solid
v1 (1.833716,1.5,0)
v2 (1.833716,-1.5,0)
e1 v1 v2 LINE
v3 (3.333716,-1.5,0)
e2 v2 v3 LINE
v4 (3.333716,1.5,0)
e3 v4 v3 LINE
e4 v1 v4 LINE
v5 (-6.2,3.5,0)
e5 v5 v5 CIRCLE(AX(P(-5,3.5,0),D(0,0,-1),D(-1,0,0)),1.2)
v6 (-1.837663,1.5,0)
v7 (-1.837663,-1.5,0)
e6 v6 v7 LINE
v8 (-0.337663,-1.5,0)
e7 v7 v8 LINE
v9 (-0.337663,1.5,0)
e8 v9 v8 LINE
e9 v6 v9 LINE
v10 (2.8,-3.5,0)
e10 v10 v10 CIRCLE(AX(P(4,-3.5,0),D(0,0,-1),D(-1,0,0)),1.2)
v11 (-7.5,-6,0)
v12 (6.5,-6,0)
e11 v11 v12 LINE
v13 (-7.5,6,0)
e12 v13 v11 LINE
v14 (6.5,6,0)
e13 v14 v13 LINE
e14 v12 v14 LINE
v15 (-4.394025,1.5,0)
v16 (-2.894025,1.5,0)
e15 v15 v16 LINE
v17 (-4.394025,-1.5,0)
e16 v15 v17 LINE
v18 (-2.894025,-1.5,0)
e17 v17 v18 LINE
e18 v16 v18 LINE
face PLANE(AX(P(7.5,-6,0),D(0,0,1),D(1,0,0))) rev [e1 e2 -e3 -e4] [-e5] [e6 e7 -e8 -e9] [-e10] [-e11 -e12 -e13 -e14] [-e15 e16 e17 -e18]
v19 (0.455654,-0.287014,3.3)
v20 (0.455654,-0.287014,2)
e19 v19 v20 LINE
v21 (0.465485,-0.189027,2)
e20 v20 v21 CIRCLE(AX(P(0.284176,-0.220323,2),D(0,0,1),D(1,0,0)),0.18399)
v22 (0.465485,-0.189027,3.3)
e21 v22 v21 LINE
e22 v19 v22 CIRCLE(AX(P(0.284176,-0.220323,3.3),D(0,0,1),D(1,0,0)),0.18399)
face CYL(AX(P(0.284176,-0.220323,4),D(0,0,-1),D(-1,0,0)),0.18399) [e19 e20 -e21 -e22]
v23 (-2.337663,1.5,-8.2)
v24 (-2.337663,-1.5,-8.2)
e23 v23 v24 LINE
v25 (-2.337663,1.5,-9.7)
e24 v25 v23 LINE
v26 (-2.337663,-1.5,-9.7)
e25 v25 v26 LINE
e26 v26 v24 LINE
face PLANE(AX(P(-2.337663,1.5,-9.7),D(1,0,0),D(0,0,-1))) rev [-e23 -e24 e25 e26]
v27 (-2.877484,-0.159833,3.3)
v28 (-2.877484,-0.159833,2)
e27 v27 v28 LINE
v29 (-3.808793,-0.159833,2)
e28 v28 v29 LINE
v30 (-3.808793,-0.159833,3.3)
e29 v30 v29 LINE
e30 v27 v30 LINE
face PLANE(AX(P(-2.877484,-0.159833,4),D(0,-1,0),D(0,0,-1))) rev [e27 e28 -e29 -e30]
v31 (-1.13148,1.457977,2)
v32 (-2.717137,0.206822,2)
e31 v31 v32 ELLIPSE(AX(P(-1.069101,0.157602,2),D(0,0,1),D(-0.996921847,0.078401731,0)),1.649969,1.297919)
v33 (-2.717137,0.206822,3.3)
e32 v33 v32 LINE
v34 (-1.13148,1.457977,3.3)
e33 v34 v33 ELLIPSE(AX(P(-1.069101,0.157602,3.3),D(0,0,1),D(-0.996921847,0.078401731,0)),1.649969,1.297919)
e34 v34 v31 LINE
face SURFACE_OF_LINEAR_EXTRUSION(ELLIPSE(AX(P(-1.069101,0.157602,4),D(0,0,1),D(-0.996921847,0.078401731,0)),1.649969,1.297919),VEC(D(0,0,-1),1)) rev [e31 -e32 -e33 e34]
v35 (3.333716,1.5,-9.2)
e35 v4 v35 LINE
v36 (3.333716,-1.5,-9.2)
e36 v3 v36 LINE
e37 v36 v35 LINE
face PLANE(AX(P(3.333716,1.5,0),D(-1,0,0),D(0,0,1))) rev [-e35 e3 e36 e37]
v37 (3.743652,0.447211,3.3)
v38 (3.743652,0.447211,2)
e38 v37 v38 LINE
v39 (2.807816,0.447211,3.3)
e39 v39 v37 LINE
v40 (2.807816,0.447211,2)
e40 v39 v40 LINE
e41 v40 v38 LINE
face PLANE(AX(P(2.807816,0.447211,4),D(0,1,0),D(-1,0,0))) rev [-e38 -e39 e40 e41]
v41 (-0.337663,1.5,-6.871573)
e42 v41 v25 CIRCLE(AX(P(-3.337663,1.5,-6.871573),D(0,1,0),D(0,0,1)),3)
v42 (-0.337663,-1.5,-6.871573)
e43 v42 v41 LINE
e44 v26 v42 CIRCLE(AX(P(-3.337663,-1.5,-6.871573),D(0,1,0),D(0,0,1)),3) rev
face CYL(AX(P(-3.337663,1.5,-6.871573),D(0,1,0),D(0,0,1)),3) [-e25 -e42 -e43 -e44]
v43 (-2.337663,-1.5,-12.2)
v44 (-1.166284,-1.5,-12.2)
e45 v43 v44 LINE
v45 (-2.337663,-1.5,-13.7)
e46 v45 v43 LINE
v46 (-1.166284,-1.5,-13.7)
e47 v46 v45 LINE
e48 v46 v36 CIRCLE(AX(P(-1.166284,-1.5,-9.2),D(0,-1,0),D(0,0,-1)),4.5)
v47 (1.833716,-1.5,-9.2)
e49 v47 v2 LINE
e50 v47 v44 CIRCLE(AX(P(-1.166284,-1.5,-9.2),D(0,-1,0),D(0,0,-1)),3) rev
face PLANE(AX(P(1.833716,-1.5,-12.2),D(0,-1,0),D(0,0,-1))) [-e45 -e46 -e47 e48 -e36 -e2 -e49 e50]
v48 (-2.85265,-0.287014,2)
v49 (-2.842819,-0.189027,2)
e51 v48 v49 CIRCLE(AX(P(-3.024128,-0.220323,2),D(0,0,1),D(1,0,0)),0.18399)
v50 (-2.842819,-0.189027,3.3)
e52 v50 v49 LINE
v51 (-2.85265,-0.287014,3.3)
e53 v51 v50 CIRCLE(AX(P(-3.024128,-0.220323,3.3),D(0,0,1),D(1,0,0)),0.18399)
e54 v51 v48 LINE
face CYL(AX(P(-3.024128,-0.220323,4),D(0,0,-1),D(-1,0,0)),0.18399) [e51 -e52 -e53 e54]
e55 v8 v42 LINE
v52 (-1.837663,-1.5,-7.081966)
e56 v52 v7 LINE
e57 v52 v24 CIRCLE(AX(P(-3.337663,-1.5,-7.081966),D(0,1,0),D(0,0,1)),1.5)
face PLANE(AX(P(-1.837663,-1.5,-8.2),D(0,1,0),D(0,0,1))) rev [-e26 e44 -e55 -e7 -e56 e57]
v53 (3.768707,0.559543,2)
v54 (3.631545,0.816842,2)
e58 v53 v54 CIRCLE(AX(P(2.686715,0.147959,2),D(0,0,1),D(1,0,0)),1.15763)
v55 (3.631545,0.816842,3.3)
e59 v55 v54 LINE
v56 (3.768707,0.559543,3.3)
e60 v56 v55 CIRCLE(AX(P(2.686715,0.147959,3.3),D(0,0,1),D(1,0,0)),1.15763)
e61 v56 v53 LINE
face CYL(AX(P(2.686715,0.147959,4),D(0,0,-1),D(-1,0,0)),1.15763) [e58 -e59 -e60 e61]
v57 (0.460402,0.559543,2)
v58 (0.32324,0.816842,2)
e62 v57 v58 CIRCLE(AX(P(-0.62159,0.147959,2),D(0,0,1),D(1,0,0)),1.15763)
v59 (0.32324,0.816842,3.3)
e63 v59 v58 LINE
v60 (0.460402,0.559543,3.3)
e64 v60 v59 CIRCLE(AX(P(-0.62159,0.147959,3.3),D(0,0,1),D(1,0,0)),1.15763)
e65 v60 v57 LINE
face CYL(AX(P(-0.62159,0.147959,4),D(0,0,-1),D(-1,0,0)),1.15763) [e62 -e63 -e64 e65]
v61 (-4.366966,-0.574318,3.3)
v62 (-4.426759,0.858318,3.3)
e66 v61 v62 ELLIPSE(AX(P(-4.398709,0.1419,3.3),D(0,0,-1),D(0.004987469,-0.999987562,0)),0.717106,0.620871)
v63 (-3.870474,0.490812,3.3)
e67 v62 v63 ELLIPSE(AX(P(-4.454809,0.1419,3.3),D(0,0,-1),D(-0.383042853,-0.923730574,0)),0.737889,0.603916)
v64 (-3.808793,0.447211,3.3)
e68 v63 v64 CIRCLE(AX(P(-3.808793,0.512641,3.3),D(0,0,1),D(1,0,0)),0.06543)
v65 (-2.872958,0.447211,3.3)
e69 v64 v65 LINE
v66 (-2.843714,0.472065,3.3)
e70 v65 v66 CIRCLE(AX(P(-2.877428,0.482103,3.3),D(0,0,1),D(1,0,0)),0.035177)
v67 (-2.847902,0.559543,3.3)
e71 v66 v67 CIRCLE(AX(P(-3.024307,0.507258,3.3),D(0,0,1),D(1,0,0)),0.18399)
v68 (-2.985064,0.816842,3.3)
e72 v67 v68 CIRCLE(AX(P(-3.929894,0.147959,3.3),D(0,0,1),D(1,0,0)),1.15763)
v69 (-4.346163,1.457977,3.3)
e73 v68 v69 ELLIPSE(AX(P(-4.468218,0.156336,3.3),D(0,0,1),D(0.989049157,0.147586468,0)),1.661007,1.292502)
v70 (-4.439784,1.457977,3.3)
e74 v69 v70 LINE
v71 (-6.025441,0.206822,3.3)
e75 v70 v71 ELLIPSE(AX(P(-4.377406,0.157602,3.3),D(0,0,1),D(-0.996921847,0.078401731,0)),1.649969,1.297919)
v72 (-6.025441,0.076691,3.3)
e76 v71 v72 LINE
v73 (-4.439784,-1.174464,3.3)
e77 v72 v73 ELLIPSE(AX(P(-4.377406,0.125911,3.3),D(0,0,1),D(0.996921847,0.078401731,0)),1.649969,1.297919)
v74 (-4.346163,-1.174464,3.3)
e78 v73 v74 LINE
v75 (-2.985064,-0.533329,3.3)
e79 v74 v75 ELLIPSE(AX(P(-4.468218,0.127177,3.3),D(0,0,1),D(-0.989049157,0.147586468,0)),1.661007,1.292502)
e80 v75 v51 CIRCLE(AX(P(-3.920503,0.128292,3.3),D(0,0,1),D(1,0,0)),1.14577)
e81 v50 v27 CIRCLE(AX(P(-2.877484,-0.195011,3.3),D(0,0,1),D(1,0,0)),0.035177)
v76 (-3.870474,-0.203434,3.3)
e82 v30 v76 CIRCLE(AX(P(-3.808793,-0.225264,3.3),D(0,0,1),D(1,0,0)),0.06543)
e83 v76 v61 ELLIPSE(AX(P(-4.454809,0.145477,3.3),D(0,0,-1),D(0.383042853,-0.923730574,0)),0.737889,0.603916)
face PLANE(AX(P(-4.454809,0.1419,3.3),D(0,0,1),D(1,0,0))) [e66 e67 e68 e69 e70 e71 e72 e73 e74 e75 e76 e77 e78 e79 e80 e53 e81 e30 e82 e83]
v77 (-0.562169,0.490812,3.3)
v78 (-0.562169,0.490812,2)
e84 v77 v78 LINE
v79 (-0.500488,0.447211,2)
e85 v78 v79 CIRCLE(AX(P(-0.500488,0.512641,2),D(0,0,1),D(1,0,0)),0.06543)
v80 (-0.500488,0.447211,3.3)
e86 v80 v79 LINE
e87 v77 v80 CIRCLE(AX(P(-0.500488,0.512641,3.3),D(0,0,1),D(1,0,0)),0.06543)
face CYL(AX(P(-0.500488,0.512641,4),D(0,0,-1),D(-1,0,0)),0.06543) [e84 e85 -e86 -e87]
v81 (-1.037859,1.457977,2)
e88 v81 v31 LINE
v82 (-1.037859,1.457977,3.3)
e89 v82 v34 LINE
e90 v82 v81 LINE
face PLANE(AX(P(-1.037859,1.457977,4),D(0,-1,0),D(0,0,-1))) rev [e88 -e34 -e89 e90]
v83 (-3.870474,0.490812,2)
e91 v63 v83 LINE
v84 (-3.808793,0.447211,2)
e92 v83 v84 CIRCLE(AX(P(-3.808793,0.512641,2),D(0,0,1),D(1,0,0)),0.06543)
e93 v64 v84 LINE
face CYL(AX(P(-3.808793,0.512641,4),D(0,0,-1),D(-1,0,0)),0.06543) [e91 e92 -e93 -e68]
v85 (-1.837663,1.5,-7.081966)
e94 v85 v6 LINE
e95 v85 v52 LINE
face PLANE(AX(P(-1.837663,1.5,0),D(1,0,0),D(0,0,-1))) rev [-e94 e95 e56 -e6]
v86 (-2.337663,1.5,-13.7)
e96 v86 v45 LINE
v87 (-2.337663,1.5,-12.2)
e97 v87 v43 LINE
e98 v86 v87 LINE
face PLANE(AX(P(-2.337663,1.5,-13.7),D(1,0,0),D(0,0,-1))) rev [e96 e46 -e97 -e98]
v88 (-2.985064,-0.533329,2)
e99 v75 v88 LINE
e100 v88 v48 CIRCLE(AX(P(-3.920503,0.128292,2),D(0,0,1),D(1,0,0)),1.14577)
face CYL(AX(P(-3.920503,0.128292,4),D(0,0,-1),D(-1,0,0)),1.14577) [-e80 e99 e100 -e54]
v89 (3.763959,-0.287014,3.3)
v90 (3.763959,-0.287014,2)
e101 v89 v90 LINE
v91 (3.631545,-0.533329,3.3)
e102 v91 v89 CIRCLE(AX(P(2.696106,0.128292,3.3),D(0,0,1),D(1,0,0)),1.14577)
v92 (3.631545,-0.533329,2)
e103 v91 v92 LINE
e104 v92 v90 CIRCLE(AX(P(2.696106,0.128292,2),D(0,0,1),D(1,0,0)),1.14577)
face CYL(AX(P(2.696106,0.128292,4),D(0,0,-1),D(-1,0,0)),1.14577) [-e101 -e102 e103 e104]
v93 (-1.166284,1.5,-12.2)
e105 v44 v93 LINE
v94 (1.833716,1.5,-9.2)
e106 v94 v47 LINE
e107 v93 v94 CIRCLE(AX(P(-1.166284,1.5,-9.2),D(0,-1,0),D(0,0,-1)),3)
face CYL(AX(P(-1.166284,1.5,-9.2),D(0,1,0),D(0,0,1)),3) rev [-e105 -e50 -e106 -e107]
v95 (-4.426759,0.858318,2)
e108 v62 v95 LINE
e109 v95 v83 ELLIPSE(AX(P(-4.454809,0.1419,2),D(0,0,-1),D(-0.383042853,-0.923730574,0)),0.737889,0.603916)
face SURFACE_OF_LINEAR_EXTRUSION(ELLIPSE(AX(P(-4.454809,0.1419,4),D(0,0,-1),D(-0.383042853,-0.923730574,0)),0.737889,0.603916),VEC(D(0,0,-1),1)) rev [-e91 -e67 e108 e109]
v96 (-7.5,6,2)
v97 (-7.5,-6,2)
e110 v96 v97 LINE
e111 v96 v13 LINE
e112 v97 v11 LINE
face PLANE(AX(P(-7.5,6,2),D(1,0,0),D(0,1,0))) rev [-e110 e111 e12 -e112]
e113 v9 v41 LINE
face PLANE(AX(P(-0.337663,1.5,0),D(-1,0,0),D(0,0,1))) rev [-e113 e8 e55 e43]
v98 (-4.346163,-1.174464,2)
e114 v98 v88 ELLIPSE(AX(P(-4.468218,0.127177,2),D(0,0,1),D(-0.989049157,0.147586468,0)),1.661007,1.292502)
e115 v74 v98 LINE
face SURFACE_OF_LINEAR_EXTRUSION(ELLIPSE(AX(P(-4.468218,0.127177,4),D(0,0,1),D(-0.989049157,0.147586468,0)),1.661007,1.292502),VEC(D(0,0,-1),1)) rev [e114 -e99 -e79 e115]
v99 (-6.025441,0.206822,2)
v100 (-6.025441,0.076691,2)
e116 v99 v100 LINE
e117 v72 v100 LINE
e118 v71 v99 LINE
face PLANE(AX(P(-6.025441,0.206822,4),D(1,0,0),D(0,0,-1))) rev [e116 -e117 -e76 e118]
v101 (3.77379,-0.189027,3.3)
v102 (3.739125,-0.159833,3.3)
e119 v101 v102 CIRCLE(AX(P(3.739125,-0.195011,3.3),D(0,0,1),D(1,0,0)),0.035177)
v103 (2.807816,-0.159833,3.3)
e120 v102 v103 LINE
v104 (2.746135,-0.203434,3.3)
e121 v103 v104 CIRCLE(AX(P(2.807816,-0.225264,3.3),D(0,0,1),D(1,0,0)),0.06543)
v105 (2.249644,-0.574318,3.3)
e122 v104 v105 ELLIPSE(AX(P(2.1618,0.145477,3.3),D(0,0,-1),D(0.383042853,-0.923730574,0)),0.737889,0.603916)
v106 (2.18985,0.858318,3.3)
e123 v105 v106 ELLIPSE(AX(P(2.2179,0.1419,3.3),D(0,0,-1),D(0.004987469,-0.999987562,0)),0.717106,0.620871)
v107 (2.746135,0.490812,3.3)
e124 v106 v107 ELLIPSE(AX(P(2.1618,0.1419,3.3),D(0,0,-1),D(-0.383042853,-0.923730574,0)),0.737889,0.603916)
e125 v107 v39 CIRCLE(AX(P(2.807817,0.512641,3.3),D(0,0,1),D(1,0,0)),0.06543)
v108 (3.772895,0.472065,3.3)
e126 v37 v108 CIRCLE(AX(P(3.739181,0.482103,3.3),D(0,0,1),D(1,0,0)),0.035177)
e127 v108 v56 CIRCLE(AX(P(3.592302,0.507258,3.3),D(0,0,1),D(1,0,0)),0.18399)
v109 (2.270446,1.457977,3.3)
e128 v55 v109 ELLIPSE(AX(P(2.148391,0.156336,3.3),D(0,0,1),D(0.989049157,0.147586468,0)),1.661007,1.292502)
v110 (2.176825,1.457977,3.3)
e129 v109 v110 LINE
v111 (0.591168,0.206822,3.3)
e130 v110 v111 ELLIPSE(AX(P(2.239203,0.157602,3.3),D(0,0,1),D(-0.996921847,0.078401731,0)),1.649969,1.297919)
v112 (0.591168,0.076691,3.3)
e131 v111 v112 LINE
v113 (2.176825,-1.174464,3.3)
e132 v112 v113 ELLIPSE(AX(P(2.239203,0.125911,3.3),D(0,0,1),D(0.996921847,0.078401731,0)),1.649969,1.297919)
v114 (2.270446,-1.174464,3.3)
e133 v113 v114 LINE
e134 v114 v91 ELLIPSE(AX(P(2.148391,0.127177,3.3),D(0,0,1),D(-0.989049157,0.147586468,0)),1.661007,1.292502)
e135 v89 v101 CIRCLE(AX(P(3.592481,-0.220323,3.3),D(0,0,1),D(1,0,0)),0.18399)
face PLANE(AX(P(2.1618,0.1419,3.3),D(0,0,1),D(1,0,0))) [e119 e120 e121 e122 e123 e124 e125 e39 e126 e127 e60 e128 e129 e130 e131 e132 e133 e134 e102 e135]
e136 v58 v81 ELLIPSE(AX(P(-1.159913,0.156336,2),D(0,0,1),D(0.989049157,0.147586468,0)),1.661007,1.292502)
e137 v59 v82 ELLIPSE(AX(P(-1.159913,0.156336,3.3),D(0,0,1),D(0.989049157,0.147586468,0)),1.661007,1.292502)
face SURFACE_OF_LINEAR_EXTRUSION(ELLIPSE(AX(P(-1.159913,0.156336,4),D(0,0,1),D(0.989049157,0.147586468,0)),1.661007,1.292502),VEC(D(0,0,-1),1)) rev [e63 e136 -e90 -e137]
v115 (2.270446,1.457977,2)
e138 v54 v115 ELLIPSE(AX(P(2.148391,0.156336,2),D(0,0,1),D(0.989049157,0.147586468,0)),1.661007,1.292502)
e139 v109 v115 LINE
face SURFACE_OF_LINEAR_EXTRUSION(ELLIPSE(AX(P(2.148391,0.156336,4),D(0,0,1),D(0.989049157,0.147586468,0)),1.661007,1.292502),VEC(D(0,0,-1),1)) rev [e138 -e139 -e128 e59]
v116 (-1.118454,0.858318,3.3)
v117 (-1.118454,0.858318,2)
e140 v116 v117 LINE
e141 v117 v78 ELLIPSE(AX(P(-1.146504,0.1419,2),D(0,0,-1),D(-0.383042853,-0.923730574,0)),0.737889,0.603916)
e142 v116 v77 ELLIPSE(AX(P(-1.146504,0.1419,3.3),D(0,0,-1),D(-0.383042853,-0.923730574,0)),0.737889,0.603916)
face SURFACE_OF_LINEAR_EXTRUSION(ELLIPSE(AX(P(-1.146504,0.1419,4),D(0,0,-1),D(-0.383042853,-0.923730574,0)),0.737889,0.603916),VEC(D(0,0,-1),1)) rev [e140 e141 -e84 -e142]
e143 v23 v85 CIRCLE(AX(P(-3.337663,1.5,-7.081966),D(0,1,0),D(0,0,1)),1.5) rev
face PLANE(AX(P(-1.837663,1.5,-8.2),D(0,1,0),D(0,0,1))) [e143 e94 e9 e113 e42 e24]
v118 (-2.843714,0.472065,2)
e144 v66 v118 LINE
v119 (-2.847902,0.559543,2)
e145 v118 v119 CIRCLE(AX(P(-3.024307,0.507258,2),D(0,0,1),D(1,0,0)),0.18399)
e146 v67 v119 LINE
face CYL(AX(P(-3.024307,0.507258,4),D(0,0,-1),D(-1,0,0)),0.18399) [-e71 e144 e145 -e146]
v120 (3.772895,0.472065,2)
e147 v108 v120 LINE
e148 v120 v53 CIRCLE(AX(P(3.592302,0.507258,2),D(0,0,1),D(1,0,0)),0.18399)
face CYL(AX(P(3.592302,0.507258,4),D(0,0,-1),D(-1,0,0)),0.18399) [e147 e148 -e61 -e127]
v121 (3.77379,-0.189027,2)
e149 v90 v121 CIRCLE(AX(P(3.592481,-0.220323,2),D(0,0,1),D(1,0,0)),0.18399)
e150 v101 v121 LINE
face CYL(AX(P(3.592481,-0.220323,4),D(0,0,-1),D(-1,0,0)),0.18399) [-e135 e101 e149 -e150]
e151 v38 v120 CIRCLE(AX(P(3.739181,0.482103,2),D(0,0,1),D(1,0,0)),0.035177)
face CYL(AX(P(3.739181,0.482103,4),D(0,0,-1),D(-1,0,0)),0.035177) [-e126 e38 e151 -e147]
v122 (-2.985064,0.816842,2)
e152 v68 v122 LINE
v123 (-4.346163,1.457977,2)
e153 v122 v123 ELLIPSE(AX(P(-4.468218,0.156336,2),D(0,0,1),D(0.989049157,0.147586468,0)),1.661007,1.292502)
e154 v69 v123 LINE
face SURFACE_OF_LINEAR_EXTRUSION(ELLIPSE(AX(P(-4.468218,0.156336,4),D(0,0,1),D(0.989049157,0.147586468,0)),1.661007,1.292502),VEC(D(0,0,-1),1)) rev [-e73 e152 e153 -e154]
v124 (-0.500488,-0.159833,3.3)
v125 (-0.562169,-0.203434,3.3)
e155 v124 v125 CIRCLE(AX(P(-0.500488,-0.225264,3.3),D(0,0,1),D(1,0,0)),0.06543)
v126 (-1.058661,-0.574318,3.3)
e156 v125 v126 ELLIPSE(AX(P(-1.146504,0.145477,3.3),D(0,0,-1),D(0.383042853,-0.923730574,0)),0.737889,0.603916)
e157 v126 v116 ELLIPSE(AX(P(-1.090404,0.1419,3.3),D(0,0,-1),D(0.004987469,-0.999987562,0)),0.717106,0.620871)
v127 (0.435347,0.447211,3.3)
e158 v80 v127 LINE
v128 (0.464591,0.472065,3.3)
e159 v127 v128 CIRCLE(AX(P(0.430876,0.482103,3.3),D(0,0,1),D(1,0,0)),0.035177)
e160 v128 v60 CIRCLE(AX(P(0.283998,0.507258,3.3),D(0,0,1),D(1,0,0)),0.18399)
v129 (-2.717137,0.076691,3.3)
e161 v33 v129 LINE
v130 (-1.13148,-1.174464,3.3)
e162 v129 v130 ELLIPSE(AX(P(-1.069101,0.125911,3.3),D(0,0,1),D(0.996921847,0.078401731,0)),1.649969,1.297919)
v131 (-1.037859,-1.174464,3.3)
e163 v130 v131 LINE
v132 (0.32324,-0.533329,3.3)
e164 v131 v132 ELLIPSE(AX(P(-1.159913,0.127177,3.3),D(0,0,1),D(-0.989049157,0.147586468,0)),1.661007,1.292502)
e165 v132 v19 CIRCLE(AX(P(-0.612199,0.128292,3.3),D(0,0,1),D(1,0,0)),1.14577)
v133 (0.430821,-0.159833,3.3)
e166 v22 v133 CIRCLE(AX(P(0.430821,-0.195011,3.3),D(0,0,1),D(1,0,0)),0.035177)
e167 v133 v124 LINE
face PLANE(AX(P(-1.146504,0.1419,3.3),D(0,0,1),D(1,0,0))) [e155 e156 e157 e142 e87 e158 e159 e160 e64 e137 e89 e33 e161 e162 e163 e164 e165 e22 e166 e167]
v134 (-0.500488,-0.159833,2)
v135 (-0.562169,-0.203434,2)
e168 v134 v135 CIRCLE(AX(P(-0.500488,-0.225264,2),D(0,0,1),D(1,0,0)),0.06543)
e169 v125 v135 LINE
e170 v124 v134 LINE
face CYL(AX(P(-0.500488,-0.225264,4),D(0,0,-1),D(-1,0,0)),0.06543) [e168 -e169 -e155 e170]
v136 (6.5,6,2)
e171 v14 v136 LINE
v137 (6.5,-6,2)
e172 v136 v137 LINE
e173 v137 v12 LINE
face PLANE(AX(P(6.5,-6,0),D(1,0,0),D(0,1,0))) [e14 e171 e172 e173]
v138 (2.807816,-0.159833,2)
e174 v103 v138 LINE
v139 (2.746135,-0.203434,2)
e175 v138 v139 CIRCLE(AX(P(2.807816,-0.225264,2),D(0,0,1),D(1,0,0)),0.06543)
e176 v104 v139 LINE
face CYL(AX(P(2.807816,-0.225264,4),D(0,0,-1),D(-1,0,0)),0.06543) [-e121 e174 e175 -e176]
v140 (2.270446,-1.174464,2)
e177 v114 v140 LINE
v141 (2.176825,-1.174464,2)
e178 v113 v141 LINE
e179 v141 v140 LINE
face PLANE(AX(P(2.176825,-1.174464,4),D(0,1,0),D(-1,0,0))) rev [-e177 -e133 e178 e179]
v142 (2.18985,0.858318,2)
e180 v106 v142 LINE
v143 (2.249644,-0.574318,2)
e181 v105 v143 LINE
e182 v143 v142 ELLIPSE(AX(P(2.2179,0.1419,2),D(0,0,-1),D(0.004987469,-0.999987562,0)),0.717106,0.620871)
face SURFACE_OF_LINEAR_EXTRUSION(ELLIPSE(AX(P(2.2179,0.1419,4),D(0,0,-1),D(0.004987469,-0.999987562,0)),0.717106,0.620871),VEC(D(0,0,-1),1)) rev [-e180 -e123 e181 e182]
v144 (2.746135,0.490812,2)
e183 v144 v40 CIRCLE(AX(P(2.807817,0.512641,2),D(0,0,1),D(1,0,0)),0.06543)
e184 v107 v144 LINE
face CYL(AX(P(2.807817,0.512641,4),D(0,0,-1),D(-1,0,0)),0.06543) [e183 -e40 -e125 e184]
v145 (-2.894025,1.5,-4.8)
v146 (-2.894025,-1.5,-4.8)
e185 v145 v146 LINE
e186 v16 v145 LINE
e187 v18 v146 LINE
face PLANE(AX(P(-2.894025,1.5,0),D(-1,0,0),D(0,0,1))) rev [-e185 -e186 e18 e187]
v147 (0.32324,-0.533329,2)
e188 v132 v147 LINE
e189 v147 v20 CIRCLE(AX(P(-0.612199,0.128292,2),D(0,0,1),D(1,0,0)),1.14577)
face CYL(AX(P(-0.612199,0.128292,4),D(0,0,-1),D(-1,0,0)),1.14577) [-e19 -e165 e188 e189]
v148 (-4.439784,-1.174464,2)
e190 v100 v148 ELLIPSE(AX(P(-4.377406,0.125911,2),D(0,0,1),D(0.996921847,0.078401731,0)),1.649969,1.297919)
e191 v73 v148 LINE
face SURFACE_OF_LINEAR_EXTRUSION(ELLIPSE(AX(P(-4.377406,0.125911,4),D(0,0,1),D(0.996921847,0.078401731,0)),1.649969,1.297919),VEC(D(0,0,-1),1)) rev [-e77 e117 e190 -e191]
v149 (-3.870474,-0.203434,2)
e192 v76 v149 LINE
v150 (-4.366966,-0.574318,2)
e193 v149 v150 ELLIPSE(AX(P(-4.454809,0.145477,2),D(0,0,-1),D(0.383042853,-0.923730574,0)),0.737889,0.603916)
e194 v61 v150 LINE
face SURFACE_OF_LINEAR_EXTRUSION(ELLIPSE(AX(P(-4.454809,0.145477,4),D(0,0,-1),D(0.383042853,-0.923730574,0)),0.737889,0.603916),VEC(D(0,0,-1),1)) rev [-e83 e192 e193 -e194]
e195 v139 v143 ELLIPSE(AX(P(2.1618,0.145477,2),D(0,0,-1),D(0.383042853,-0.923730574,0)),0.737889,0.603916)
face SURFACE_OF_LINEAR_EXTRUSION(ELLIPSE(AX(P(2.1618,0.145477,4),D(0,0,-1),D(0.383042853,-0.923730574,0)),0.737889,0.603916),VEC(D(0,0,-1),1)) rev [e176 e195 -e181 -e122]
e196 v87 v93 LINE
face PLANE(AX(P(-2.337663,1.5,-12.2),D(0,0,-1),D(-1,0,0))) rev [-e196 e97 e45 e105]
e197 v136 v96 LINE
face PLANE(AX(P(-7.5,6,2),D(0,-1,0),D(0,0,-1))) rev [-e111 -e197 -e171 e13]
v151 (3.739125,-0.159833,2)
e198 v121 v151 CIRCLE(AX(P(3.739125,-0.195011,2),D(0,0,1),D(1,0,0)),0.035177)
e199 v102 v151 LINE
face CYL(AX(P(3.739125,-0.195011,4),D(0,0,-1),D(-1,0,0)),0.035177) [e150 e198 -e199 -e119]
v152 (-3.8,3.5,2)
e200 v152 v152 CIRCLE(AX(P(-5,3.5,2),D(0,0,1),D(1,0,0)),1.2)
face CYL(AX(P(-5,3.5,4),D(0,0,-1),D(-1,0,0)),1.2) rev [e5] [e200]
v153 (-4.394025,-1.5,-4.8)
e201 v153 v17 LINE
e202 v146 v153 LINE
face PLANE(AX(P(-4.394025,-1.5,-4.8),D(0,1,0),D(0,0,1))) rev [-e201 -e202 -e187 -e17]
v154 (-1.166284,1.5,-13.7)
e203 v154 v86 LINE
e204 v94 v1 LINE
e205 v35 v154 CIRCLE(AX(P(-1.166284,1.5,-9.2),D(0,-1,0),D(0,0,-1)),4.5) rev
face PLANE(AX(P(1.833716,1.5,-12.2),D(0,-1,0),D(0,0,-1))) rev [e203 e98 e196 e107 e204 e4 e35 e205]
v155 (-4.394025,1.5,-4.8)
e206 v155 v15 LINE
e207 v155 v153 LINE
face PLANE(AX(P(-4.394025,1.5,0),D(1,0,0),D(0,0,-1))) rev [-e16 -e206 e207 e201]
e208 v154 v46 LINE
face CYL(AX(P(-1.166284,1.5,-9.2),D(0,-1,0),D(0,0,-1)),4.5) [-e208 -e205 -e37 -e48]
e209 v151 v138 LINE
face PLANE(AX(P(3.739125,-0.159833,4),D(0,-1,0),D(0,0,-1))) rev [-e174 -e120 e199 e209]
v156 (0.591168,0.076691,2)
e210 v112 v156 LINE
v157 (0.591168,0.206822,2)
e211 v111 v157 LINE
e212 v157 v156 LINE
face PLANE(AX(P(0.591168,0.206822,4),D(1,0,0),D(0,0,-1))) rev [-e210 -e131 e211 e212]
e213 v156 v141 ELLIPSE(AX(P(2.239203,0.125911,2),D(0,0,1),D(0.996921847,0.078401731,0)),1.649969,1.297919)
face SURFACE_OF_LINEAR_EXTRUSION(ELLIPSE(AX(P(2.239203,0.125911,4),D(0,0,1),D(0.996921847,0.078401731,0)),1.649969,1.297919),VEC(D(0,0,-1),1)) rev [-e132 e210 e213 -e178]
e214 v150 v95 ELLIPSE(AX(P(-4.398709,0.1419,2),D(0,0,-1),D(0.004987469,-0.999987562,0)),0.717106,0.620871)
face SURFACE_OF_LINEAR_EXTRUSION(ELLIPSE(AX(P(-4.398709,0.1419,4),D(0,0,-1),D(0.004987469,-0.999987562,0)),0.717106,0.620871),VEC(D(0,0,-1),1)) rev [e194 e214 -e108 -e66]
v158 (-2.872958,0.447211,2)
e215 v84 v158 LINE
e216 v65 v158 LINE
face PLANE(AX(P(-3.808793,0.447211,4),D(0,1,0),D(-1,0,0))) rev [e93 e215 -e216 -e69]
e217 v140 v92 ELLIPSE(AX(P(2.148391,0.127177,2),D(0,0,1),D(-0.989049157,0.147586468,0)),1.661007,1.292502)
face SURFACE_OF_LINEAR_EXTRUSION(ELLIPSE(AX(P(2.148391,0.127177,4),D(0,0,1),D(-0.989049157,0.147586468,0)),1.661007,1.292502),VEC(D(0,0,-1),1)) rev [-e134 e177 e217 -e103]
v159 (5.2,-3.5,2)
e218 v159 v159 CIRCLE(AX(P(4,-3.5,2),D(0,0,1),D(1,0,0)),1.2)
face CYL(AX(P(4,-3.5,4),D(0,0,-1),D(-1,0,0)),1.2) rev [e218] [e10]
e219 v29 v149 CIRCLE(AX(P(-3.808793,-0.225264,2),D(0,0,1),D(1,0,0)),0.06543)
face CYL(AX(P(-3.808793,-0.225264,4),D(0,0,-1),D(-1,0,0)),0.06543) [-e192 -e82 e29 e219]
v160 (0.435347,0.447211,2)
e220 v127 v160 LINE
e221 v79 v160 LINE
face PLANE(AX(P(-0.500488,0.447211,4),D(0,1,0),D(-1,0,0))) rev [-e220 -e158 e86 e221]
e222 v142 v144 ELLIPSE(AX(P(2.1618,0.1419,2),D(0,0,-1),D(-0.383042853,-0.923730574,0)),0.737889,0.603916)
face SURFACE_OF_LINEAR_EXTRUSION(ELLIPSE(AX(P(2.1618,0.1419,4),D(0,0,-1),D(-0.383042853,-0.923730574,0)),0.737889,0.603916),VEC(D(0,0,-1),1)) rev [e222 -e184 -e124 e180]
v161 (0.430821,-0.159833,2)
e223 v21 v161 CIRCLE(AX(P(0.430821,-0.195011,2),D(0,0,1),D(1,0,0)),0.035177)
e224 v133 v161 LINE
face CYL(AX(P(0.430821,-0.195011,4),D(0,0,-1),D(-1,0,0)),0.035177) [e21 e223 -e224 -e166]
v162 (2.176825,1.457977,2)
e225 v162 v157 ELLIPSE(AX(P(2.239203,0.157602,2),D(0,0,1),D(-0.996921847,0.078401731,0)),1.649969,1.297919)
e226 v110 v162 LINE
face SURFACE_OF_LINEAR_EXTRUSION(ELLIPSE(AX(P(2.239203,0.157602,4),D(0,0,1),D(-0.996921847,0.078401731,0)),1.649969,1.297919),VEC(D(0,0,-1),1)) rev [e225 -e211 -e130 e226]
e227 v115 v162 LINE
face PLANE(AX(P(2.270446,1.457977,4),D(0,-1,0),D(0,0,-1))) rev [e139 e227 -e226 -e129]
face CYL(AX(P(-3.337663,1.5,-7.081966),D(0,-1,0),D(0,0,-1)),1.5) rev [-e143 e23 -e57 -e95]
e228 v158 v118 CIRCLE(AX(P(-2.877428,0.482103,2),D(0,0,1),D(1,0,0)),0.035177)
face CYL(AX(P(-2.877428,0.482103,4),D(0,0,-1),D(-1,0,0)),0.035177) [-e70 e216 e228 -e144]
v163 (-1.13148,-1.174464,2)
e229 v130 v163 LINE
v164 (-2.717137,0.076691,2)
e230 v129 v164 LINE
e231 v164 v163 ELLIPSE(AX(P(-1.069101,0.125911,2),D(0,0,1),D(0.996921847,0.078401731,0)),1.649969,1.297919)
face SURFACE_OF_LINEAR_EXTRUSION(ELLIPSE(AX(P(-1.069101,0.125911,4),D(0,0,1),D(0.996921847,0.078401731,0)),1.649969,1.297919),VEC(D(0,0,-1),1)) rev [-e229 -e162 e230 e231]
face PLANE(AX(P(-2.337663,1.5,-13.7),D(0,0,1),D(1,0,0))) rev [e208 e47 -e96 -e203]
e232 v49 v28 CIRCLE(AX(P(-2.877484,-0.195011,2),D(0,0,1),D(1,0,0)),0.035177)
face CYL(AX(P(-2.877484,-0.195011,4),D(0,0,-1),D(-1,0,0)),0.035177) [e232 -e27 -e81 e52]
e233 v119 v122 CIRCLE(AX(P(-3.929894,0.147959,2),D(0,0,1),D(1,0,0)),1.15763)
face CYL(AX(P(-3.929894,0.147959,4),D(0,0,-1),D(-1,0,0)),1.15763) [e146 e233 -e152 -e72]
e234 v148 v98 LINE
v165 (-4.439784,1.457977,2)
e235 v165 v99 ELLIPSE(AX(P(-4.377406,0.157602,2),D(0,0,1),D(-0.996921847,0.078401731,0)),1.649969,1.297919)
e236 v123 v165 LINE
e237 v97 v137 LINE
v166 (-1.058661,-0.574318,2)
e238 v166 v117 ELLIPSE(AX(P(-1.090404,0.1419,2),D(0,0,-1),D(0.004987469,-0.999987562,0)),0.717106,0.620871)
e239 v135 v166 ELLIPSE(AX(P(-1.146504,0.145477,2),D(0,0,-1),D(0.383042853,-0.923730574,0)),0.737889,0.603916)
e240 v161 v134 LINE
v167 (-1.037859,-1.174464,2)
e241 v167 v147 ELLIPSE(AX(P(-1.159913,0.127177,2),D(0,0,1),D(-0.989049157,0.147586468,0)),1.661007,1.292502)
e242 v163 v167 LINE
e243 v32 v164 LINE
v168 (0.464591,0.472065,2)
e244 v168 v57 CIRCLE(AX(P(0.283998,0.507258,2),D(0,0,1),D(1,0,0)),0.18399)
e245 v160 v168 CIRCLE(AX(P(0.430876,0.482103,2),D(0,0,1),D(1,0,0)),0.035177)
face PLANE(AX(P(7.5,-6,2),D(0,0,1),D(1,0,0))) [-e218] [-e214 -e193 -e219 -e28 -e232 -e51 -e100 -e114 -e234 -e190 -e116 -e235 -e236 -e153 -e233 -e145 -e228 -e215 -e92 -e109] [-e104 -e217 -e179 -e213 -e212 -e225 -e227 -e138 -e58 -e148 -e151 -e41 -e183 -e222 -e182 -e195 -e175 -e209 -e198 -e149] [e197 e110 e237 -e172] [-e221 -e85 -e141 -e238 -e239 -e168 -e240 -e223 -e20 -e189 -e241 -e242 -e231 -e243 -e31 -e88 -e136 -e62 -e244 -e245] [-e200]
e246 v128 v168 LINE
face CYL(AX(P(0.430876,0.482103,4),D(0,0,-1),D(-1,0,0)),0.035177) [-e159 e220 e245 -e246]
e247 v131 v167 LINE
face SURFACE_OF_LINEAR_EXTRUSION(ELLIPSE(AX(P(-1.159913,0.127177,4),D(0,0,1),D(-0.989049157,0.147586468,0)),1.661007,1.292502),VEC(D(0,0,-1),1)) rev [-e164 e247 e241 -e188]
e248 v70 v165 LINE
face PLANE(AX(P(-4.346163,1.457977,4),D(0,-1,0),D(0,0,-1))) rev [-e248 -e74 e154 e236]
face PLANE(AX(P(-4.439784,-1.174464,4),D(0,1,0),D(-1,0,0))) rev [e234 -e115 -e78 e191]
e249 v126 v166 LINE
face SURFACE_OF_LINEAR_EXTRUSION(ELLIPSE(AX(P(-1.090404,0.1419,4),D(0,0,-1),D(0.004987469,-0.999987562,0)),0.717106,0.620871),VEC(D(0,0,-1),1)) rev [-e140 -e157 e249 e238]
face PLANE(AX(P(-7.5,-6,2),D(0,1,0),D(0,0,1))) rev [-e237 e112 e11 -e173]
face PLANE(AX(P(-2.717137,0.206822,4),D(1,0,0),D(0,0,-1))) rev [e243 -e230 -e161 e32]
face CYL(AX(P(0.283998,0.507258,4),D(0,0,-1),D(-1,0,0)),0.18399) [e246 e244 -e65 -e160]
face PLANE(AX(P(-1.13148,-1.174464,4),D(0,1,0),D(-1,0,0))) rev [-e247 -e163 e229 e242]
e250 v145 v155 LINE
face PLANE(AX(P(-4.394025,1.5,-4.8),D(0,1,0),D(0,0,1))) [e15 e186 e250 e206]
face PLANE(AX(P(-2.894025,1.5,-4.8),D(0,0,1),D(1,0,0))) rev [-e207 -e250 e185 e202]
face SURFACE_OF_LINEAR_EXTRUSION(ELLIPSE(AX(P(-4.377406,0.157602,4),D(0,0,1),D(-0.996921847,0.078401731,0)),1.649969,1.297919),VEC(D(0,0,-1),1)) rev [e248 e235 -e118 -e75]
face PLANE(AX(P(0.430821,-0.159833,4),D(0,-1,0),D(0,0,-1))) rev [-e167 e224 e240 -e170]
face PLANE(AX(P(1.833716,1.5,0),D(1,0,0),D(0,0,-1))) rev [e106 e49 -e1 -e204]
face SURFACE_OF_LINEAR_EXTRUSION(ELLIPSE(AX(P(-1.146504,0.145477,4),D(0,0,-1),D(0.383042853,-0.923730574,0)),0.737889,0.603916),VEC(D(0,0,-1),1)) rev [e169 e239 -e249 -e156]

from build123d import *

# Parameters (mm, degrees)
SKETCH1_W           = 15
SKETCH1_H           = 12
BOSS_EXTRUDE1_DEPTH = 2
BOSS_EXTRUDE2_DEPTH = 2
SKETCH3_W           = 1.5
SKETCH3_H           = 4.8
BOSS_EXTRUDE3_DEPTH = 1.5
FILLET3_START       = -1.5
FILLET3_DEPTH       = 3
FILLET4_R           = 3
FILLET5_R           = 3
FILLET6_R           = 4.5
SKETCH4_W           = 2
SKETCH4_H           = 12
CUT_EXTRUDE1_DEPTH  = 1
SKETCH5_R           = 1.2
CUT_EXTRUDE2_DEPTH  = 17.731407672
CUT_EXTRUDE3_START  = -0.7
CUT_EXTRUDE3_DEPTH  = 0.7


with BuildPart() as part:
    # Sketch1 → Boss-Extrude1 (new body)
    with BuildSketch(Plane.XY):
        Rectangle(SKETCH1_W, SKETCH1_H)
    extrude(amount=BOSS_EXTRUDE1_DEPTH)

    # Sketch2 → Boss-Extrude2 (add)
    with BuildSketch(Plane.XY.offset(2)):
        with BuildLine():
            Line((-0.500488048, 0.447210694), (0.435347045, 0.447210694))
            ThreePointArc((0.435347045, 0.447210694), (0.453657173, 0.45529852), (0.464590943, 0.472065344))
            ThreePointArc((0.464590943, 0.472065344), (0.467777397, 0.516057125), (0.460402384, 0.559543208))
            ThreePointArc((0.460402384, 0.559543208), (0.399954535, 0.692528449), (0.323240273, 0.816842321))
            add(Edge.make_bspline(
                [(0.323240273, 0.816842321), (-0.095057279, 1.457976678), (-1.037858727, 1.457976694)],
                knots=[0.342748392, 0.342748392, 0.342748392, 1.381331674, 1.381331674, 1.381331674], degree=2, weights=[1, 0.868170932, 1]))
            Line((-1.037858727, 1.457976694), (-1.131479815, 1.457976694))
            add(Edge.make_bspline(
                [(-1.131479815, 1.457976694), (-2.717136663, 1.457976694), (-2.717136676, 0.206821629)],
                knots=[4.81203319, 4.81203319, 4.81203319, 6.344970318, 6.344970318, 6.344970318], degree=2, weights=[1, 0.720364545, 1]))
            Line((-2.717136676, 0.206821629), (-2.717136676, 0.076691364))
            add(Edge.make_bspline(
                [(-2.717136676, 0.076691364), (-2.717136676, -1.174463735), (-1.131479784, -1.174463712)],
                knots=[3.079807634, 3.079807634, 3.079807634, 4.61274479, 4.61274479, 4.61274479], degree=2, weights=[1, 0.720364535, 1]))
            Line((-1.131479784, -1.174463712), (-1.037858761, -1.174463712))
            add(Edge.make_bspline(
                [(-1.037858761, -1.174463712), (-0.095057289, -1.174463712), (0.323240273, -0.533329339)],
                knots=[1.760260959, 1.760260959, 1.760260959, 2.798844261, 2.798844261, 2.798844261], degree=2, weights=[1, 0.868170926, 1]))
            ThreePointArc((0.323240273, -0.533329339), (0.396990367, -0.414226505), (0.455654338, -0.287013692))
            ThreePointArc((0.455654338, -0.287013692), (0.467247325, -0.238690378), (0.465485217, -0.189027163))
            ThreePointArc((0.465485217, -0.189027163), (0.453480667, -0.168104183), (0.430820669, -0.159833461))
            Line((0.430820669, -0.159833461), (-0.50048808, -0.159833461))
            ThreePointArc((-0.50048808, -0.159833461), (-0.53825591, -0.17183426), (-0.562169449, -0.203434431))
            add(Edge.make_bspline(
                [(-1.058661028, -0.574317984), (-0.693553117, -0.574677188), (-0.562169449, -0.203434431)],
                knots=[5.955155363, 5.955155363, 5.955155363, 7.020735544, 7.020735544, 7.020735544], degree=2, weights=[1, 0.86139323, 1]))
            add(Edge.make_bspline(
                [(-1.118454184, 0.858318186), (-1.740543918, 0.826860552), (-1.710558048, 0.108403064), (-1.680572179, -0.610054424), (-1.058661028, -0.574317984)],
                knots=[3.181025595, 3.181025595, 3.181025595, 4.754799698, 4.754799698, 6.328573801, 6.328573801, 6.328573801], degree=2, weights=[1, 0.706053195, 1, 0.706053195, 1]))
            add(Edge.make_bspline(
                [(-0.562169449, 0.490811684), (-0.70840827, 0.904029734), (-1.118454184, 0.858318186)],
                knots=[2.404042417, 2.404042417, 2.404042417, 3.565685694, 3.565685694, 3.565685694], degree=2, weights=[1, 0.83601209, 1]))
            ThreePointArc((-0.562169449, 0.490811684), (-0.538255894, 0.459211502), (-0.500488048, 0.447210694))
        make_face()
        with BuildLine():
            Line((-3.808792647, 0.447210694), (-2.872957501, 0.447210694))
            ThreePointArc((-2.872957501, 0.447210694), (-2.854647373, 0.45529852), (-2.843713602, 0.472065344))
            ThreePointArc((-2.843713602, 0.472065344), (-2.840527149, 0.516057125), (-2.847902161, 0.559543208))
            ThreePointArc((-2.847902161, 0.559543208), (-2.90835001, 0.692528449), (-2.985064272, 0.816842321))
            add(Edge.make_bspline(
                [(-2.985064272, 0.816842321), (-3.403361825, 1.457976679), (-4.346163273, 1.457976694)],
                knots=[0.342748392, 0.342748392, 0.342748392, 1.381331674, 1.381331674, 1.381331674], degree=2, weights=[1, 0.868170932, 1]))
            Line((-4.346163273, 1.457976694), (-4.43978436, 1.457976694))
            add(Edge.make_bspline(
                [(-4.43978436, 1.457976694), (-6.025441208, 1.457976694), (-6.025441222, 0.206821629)],
                knots=[4.81203319, 4.81203319, 4.81203319, 6.344970318, 6.344970318, 6.344970318], degree=2, weights=[1, 0.720364545, 1]))
            Line((-6.025441222, 0.206821629), (-6.025441222, 0.076691364))
            add(Edge.make_bspline(
                [(-6.025441222, 0.076691364), (-6.025441222, -1.174463735), (-4.439784331, -1.174463712)],
                knots=[6.221400287, 6.221400287, 6.221400287, 7.754337442, 7.754337442, 7.754337442], degree=2, weights=[1, 0.720364536, 1]))
            Line((-4.439784331, -1.174463712), (-4.346163307, -1.174463712))
            add(Edge.make_bspline(
                [(-4.346163307, -1.174463712), (-3.403361835, -1.174463712), (-2.985064272, -0.533329339)],
                knots=[1.760260959, 1.760260959, 1.760260959, 2.798844261, 2.798844261, 2.798844261], degree=2, weights=[1, 0.868170926, 1]))
            ThreePointArc((-2.985064272, -0.533329339), (-2.911314179, -0.414226505), (-2.852650208, -0.287013692))
            ThreePointArc((-2.852650208, -0.287013692), (-2.84105722, -0.238690378), (-2.842819329, -0.189027163))
            ThreePointArc((-2.842819329, -0.189027163), (-2.854823879, -0.168104182), (-2.877483878, -0.159833461))
            Line((-2.877483878, -0.159833461), (-3.808792626, -0.159833461))
            ThreePointArc((-3.808792626, -0.159833461), (-3.846560455, -0.17183426), (-3.870473995, -0.203434431))
            add(Edge.make_bspline(
                [(-4.366965573, -0.574317984), (-4.001857663, -0.574677188), (-3.870473995, -0.203434431)],
                knots=[2.81356271, 2.81356271, 2.81356271, 3.87914289, 3.87914289, 3.87914289], degree=2, weights=[1, 0.86139323, 1]))
            add(Edge.make_bspline(
                [(-4.42675873, 0.858318186), (-5.048848463, 0.826860552), (-5.018862594, 0.108403064), (-4.988876725, -0.610054424), (-4.366965573, -0.574317984)],
                knots=[3.181025595, 3.181025595, 3.181025595, 4.754799698, 4.754799698, 6.328573801, 6.328573801, 6.328573801], degree=2, weights=[1, 0.706053195, 1, 0.706053195, 1]))
            add(Edge.make_bspline(
                [(-3.870473995, 0.490811684), (-4.016712815, 0.904029734), (-4.42675873, 0.858318186)],
                knots=[5.54563507, 5.54563507, 5.54563507, 6.707278348, 6.707278348, 6.707278348], degree=2, weights=[1, 0.83601209, 1]))
            ThreePointArc((-3.870473995, 0.490811684), (-3.846560461, 0.459211518), (-3.808792647, 0.447210694))
        make_face()
        with BuildLine():
            Line((2.807816498, 0.447210694), (3.743651591, 0.447210694))
            ThreePointArc((3.743651591, 0.447210694), (3.761961719, 0.45529852), (3.772895489, 0.472065344))
            ThreePointArc((3.772895489, 0.472065344), (3.776081943, 0.516057125), (3.76870693, 0.559543208))
            ThreePointArc((3.76870693, 0.559543208), (3.708259081, 0.692528449), (3.631544819, 0.816842321))
            add(Edge.make_bspline(
                [(3.631544819, 0.816842321), (3.213247267, 1.457976678), (2.270445819, 1.457976694)],
                knots=[0.342748392, 0.342748392, 0.342748392, 1.381331674, 1.381331674, 1.381331674], degree=2, weights=[1, 0.868170932, 1]))
            Line((2.270445819, 1.457976694), (2.176824731, 1.457976694))
            add(Edge.make_bspline(
                [(2.176824731, 1.457976694), (0.591167883, 1.457976694), (0.59116787, 0.206821629)],
                knots=[4.81203319, 4.81203319, 4.81203319, 6.344970318, 6.344970318, 6.344970318], degree=2, weights=[1, 0.720364545, 1]))
            Line((0.59116787, 0.206821629), (0.59116787, 0.076691364))
            add(Edge.make_bspline(
                [(0.59116787, 0.076691364), (0.59116787, -1.174463735), (2.176824762, -1.174463712)],
                knots=[3.079807634, 3.079807634, 3.079807634, 4.61274479, 4.61274479, 4.61274479], degree=2, weights=[1, 0.720364535, 1]))
            Line((2.176824762, -1.174463712), (2.270445785, -1.174463712))
            add(Edge.make_bspline(
                [(2.270445785, -1.174463712), (3.213247257, -1.174463712), (3.631544819, -0.533329339)],
                knots=[1.760260959, 1.760260959, 1.760260959, 2.798844261, 2.798844261, 2.798844261], degree=2, weights=[1, 0.868170926, 1]))
            ThreePointArc((3.631544819, -0.533329339), (3.705294913, -0.414226505), (3.763958884, -0.287013692))
            ThreePointArc((3.763958884, -0.287013692), (3.775551871, -0.238690378), (3.773789763, -0.189027163))
            ThreePointArc((3.773789763, -0.189027163), (3.761785213, -0.168104183), (3.739125215, -0.159833461))
            Line((3.739125215, -0.159833461), (2.807816466, -0.159833461))
            ThreePointArc((2.807816466, -0.159833461), (2.770048636, -0.17183426), (2.746135097, -0.203434431))
            add(Edge.make_bspline(
                [(2.249643518, -0.574317984), (2.614751429, -0.574677188), (2.746135097, -0.203434431)],
                knots=[2.81356271, 2.81356271, 2.81356271, 3.87914289, 3.87914289, 3.87914289], degree=2, weights=[1, 0.86139323, 1]))
            add(Edge.make_bspline(
                [(2.189850362, 0.858318186), (1.567760628, 0.826860552), (1.597746498, 0.108403064), (1.627732367, -0.610054424), (2.249643518, -0.574317984)],
                knots=[0.039432941, 0.039432941, 0.039432941, 1.613207044, 1.613207044, 3.186981147, 3.186981147, 3.186981147], degree=2, weights=[1, 0.706053195, 1, 0.706053195, 1]))
            add(Edge.make_bspline(
                [(2.746135097, 0.490811684), (2.599896276, 0.904029734), (2.189850362, 0.858318186)],
                knots=[2.404042417, 2.404042417, 2.404042417, 3.565685694, 3.565685694, 3.565685694], degree=2, weights=[1, 0.83601209, 1]))
            ThreePointArc((2.746135097, 0.490811684), (2.770048652, 0.459211502), (2.807816498, 0.447210694))
        make_face()
    extrude(amount=BOSS_EXTRUDE2_DEPTH)

    # Sketch3 → Boss-Extrude3 (add, symmetric)
    with BuildSketch(Plane(origin=(0, 0, 0), x_dir=(1, 0, 0), z_dir=(0, 1, 0))):
        Polygon((1.833716, 0), (3.333716, 0), (3.333716, 13.7), (-2.337662633, 13.7), (-2.337662633, 12.2), (1.833716, 12.2), align=None)
        with Locations((-3.644025381, 2.4)):
            Rectangle(SKETCH3_W, SKETCH3_H)
        Polygon((-1.837662633, 0), (-0.337662633, 0), (-0.337662633, 9.7), (-2.337662633, 9.7), (-2.337662633, 8.2), (-1.837662633, 8.2), align=None)
    extrude(amount=BOSS_EXTRUDE3_DEPTH, both=True)

    # Fillet3: read off the stored shape, not the designer's step
    # Fillet3 outline → Fillet3 (add)
    with BuildSketch(Plane(origin=(0, 0, 0), x_dir=(1, 0, 0), z_dir=(0, 1, 0)).offset(FILLET3_START)):
        with BuildLine():
            Line((-1.837662633, 8.2), (-2.337662633, 8.2))
            ThreePointArc((-2.337662633, 8.2), (-1.968356239, 7.694338447), (-1.837662633, 7.081966011))
            Line((-1.837662633, 7.081966011), (-1.837662633, 8.2))
        make_face()
    extrude(amount=FILLET3_DEPTH)

    # Fillet4
    # the kernel refuses this fillet: 3 mm, written as the material it takes off along each edge
    with BuildSketch(Plane(origin=(-0.337662633, -8.571067812, -9.7), x_dir=(0, 0, 1), z_dir=(0, 1, 0))) as fillet4_piece_1:
        with BuildLine():
            CenterArc((2.828427125, -3), FILLET4_R, 90, 70.528779366)
            Line((0, -2), (-0.056568542, -1.98))
            ThreePointArc((-0.056568542, -1.98), (-0.06, -1), (-0.06, 0))
            Line((-0.06, 0), (0, 0.06))
            Line((0, 0.06), (2.828427125, 0.06))
            Line((2.828427125, 0.06), (2.828427125, 0))
        make_face()
    extrude(amount=17.142135624, mode=Mode.SUBTRACT)

    # Fillet5
    fillet5_edges = [part.edges().sort_by_distance(p)[0] for p in [
        (1.833716, 0, -12.2),
    ]]
    fillet(fillet5_edges, radius=FILLET5_R)

    # Fillet6
    fillet6_edges = [part.edges().sort_by_distance(p)[0] for p in [
        (3.333716, 0, -13.7),
    ]]
    fillet(fillet6_edges, radius=FILLET6_R)

    # Sketch4 → Cut-Extrude1 (cut)
    with BuildSketch(Plane(origin=(7.5, 0, 0), x_dir=(0, 0, -1), z_dir=(1, 0, 0))):
        with Locations((-1, 0)):
            Rectangle(SKETCH4_W, SKETCH4_H)
    extrude(amount=-CUT_EXTRUDE1_DEPTH, mode=Mode.SUBTRACT)

    # Sketch5 → Cut-Extrude2 (cut, through all)
    with BuildSketch(Plane(origin=(0, 0, 0), x_dir=(-1, 0, 0), z_dir=(0, 0, -1))):
        with Locations((-4, -3.5)):
            Circle(SKETCH5_R)
        with Locations((5, 3.5)):
            Circle(SKETCH5_R)
    extrude(amount=-CUT_EXTRUDE2_DEPTH, mode=Mode.SUBTRACT)

    # Sketch6 → Cut-Extrude3 (cut)
    with BuildSketch(Plane.XY.offset(4).offset(CUT_EXTRUDE3_START)):
        with BuildLine():
            Line((-3.808792647, 0.447210694), (-2.872957501, 0.447210694))
            ThreePointArc((-2.872957501, 0.447210694), (-2.854647373, 0.45529852), (-2.843713602, 0.472065344))
            ThreePointArc((-2.843713602, 0.472065344), (-2.840527149, 0.516057125), (-2.847902161, 0.559543208))
            ThreePointArc((-2.847902161, 0.559543208), (-2.90835001, 0.692528449), (-2.985064272, 0.816842321))
            add(Edge.make_bspline(
                [(-2.985064272, 0.816842321), (-3.403361825, 1.457976679), (-4.346163273, 1.457976694)],
                knots=[0.342748392, 0.342748392, 0.342748392, 1.381331674, 1.381331674, 1.381331674], degree=2, weights=[1, 0.868170932, 1]))
            Line((-4.346163273, 1.457976694), (-4.43978436, 1.457976694))
            add(Edge.make_bspline(
                [(-4.43978436, 1.457976694), (-6.025441208, 1.457976694), (-6.025441222, 0.206821629)],
                knots=[4.81203319, 4.81203319, 4.81203319, 6.344970318, 6.344970318, 6.344970318], degree=2, weights=[1, 0.720364545, 1]))
            Line((-6.025441222, 0.206821629), (-6.025441222, 0.076691364))
            add(Edge.make_bspline(
                [(-6.025441222, 0.076691364), (-6.025441222, -1.174463735), (-4.439784331, -1.174463712)],
                knots=[6.221400287, 6.221400287, 6.221400287, 7.754337442, 7.754337442, 7.754337442], degree=2, weights=[1, 0.720364536, 1]))
            Line((-4.439784331, -1.174463712), (-4.346163307, -1.174463712))
            add(Edge.make_bspline(
                [(-4.346163307, -1.174463712), (-3.403361835, -1.174463712), (-2.985064272, -0.533329339)],
                knots=[1.760260959, 1.760260959, 1.760260959, 2.798844261, 2.798844261, 2.798844261], degree=2, weights=[1, 0.868170926, 1]))
            ThreePointArc((-2.985064272, -0.533329339), (-2.911314179, -0.414226505), (-2.852650208, -0.287013692))
            ThreePointArc((-2.852650208, -0.287013692), (-2.84105722, -0.238690378), (-2.842819329, -0.189027163))
            ThreePointArc((-2.842819329, -0.189027163), (-2.854823879, -0.168104182), (-2.877483878, -0.159833461))
            Line((-2.877483878, -0.159833461), (-3.808792626, -0.159833461))
            ThreePointArc((-3.808792626, -0.159833461), (-3.846560455, -0.17183426), (-3.870473995, -0.203434431))
            add(Edge.make_bspline(
                [(-4.366965573, -0.574317984), (-4.001857663, -0.574677188), (-3.870473995, -0.203434431)],
                knots=[5.955155363, 5.955155363, 5.955155363, 7.020735544, 7.020735544, 7.020735544], degree=2, weights=[1, 0.86139323, 1]))
            add(Edge.make_bspline(
                [(-4.42675873, 0.858318186), (-5.048848463, 0.826860552), (-5.018862594, 0.108403064), (-4.988876725, -0.610054424), (-4.366965573, -0.574317984)],
                knots=[3.181025595, 3.181025595, 3.181025595, 4.754799698, 4.754799698, 6.328573801, 6.328573801, 6.328573801], degree=2, weights=[1, 0.706053195, 1, 0.706053195, 1]))
            add(Edge.make_bspline(
                [(-3.870473995, 0.490811684), (-4.016712815, 0.904029734), (-4.42675873, 0.858318186)],
                knots=[2.404042417, 2.404042417, 2.404042417, 3.565685694, 3.565685694, 3.565685694], degree=2, weights=[1, 0.83601209, 1]))
            ThreePointArc((-3.870473995, 0.490811684), (-3.846560461, 0.459211518), (-3.808792647, 0.447210694))
        make_face()
        with BuildLine():
            Line((-0.500488048, 0.447210694), (0.435347045, 0.447210694))
            ThreePointArc((0.435347045, 0.447210694), (0.453657173, 0.45529852), (0.464590943, 0.472065344))
            ThreePointArc((0.464590943, 0.472065344), (0.467777397, 0.516057125), (0.460402384, 0.559543208))
            ThreePointArc((0.460402384, 0.559543208), (0.399954535, 0.692528449), (0.323240273, 0.816842321))
            add(Edge.make_bspline(
                [(0.323240273, 0.816842321), (-0.095057279, 1.457976678), (-1.037858727, 1.457976694)],
                knots=[0.342748392, 0.342748392, 0.342748392, 1.381331674, 1.381331674, 1.381331674], degree=2, weights=[1, 0.868170932, 1]))
            Line((-1.037858727, 1.457976694), (-1.131479815, 1.457976694))
            add(Edge.make_bspline(
                [(-1.131479815, 1.457976694), (-2.717136663, 1.457976694), (-2.717136676, 0.206821629)],
                knots=[4.81203319, 4.81203319, 4.81203319, 6.344970318, 6.344970318, 6.344970318], degree=2, weights=[1, 0.720364545, 1]))
            Line((-2.717136676, 0.206821629), (-2.717136676, 0.076691364))
            add(Edge.make_bspline(
                [(-2.717136676, 0.076691364), (-2.717136676, -1.174463735), (-1.131479784, -1.174463712)],
                knots=[3.079807634, 3.079807634, 3.079807634, 4.61274479, 4.61274479, 4.61274479], degree=2, weights=[1, 0.720364535, 1]))
            Line((-1.131479784, -1.174463712), (-1.037858761, -1.174463712))
            add(Edge.make_bspline(
                [(-1.037858761, -1.174463712), (-0.095057289, -1.174463712), (0.323240273, -0.533329339)],
                knots=[1.760260959, 1.760260959, 1.760260959, 2.798844261, 2.798844261, 2.798844261], degree=2, weights=[1, 0.868170926, 1]))
            ThreePointArc((0.323240273, -0.533329339), (0.396990367, -0.414226505), (0.455654338, -0.287013692))
            ThreePointArc((0.455654338, -0.287013692), (0.467247325, -0.238690378), (0.465485217, -0.189027163))
            ThreePointArc((0.465485217, -0.189027163), (0.453480667, -0.168104183), (0.430820669, -0.159833461))
            Line((0.430820669, -0.159833461), (-0.50048808, -0.159833461))
            ThreePointArc((-0.50048808, -0.159833461), (-0.53825591, -0.17183426), (-0.562169449, -0.203434431))
            add(Edge.make_bspline(
                [(-1.058661028, -0.574317984), (-0.693553117, -0.574677188), (-0.562169449, -0.203434431)],
                knots=[5.955155363, 5.955155363, 5.955155363, 7.020735544, 7.020735544, 7.020735544], degree=2, weights=[1, 0.86139323, 1]))
            add(Edge.make_bspline(
                [(-1.118454184, 0.858318186), (-1.740543918, 0.826860552), (-1.710558048, 0.108403064), (-1.680572179, -0.610054424), (-1.058661028, -0.574317984)],
                knots=[3.181025595, 3.181025595, 3.181025595, 4.754799698, 4.754799698, 6.328573801, 6.328573801, 6.328573801], degree=2, weights=[1, 0.706053195, 1, 0.706053195, 1]))
            add(Edge.make_bspline(
                [(-0.562169449, 0.490811684), (-0.70840827, 0.904029734), (-1.118454184, 0.858318186)],
                knots=[2.404042417, 2.404042417, 2.404042417, 3.565685694, 3.565685694, 3.565685694], degree=2, weights=[1, 0.83601209, 1]))
            ThreePointArc((-0.562169449, 0.490811684), (-0.538255894, 0.459211502), (-0.500488048, 0.447210694))
        make_face()
        with BuildLine():
            Line((2.807816498, 0.447210694), (3.743651591, 0.447210694))
            ThreePointArc((3.743651591, 0.447210694), (3.761961719, 0.45529852), (3.772895489, 0.472065344))
            ThreePointArc((3.772895489, 0.472065344), (3.776081943, 0.516057125), (3.76870693, 0.559543208))
            ThreePointArc((3.76870693, 0.559543208), (3.708259081, 0.692528449), (3.631544819, 0.816842321))
            add(Edge.make_bspline(
                [(3.631544819, 0.816842321), (3.213247267, 1.457976678), (2.270445819, 1.457976694)],
                knots=[0.342748392, 0.342748392, 0.342748392, 1.381331674, 1.381331674, 1.381331674], degree=2, weights=[1, 0.868170932, 1]))
            Line((2.270445819, 1.457976694), (2.176824731, 1.457976694))
            add(Edge.make_bspline(
                [(2.176824731, 1.457976694), (0.591167883, 1.457976694), (0.59116787, 0.206821629)],
                knots=[4.81203319, 4.81203319, 4.81203319, 6.344970318, 6.344970318, 6.344970318], degree=2, weights=[1, 0.720364545, 1]))
            Line((0.59116787, 0.206821629), (0.59116787, 0.076691364))
            add(Edge.make_bspline(
                [(0.59116787, 0.076691364), (0.59116787, -1.174463735), (2.176824762, -1.174463712)],
                knots=[3.079807634, 3.079807634, 3.079807634, 4.61274479, 4.61274479, 4.61274479], degree=2, weights=[1, 0.720364535, 1]))
            Line((2.176824762, -1.174463712), (2.270445785, -1.174463712))
            add(Edge.make_bspline(
                [(2.270445785, -1.174463712), (3.213247257, -1.174463712), (3.631544819, -0.533329339)],
                knots=[1.760260959, 1.760260959, 1.760260959, 2.798844261, 2.798844261, 2.798844261], degree=2, weights=[1, 0.868170926, 1]))
            ThreePointArc((3.631544819, -0.533329339), (3.705294913, -0.414226505), (3.763958884, -0.287013692))
            ThreePointArc((3.763958884, -0.287013692), (3.775551871, -0.238690378), (3.773789763, -0.189027163))
            ThreePointArc((3.773789763, -0.189027163), (3.761785213, -0.168104183), (3.739125215, -0.159833461))
            Line((3.739125215, -0.159833461), (2.807816466, -0.159833461))
            ThreePointArc((2.807816466, -0.159833461), (2.770048636, -0.17183426), (2.746135097, -0.203434431))
            add(Edge.make_bspline(
                [(2.249643518, -0.574317984), (2.614751429, -0.574677188), (2.746135097, -0.203434431)],
                knots=[5.955155363, 5.955155363, 5.955155363, 7.020735544, 7.020735544, 7.020735544], degree=2, weights=[1, 0.86139323, 1]))
            add(Edge.make_bspline(
                [(2.189850362, 0.858318186), (1.567760628, 0.826860552), (1.597746498, 0.108403064), (1.627732367, -0.610054424), (2.249643518, -0.574317984)],
                knots=[3.181025595, 3.181025595, 3.181025595, 4.754799698, 4.754799698, 6.328573801, 6.328573801, 6.328573801], degree=2, weights=[1, 0.706053195, 1, 0.706053195, 1]))
            add(Edge.make_bspline(
                [(2.746135097, 0.490811684), (2.599896276, 0.904029734), (2.189850362, 0.858318186)],
                knots=[2.404042417, 2.404042417, 2.404042417, 3.565685694, 3.565685694, 3.565685694], degree=2, weights=[1, 0.83601209, 1]))
            ThreePointArc((2.746135097, 0.490811684), (2.770048652, 0.459211502), (2.807816498, 0.447210694))
        make_face()
    extrude(amount=CUT_EXTRUDE3_DEPTH, mode=Mode.SUBTRACT)


solid = part.part
